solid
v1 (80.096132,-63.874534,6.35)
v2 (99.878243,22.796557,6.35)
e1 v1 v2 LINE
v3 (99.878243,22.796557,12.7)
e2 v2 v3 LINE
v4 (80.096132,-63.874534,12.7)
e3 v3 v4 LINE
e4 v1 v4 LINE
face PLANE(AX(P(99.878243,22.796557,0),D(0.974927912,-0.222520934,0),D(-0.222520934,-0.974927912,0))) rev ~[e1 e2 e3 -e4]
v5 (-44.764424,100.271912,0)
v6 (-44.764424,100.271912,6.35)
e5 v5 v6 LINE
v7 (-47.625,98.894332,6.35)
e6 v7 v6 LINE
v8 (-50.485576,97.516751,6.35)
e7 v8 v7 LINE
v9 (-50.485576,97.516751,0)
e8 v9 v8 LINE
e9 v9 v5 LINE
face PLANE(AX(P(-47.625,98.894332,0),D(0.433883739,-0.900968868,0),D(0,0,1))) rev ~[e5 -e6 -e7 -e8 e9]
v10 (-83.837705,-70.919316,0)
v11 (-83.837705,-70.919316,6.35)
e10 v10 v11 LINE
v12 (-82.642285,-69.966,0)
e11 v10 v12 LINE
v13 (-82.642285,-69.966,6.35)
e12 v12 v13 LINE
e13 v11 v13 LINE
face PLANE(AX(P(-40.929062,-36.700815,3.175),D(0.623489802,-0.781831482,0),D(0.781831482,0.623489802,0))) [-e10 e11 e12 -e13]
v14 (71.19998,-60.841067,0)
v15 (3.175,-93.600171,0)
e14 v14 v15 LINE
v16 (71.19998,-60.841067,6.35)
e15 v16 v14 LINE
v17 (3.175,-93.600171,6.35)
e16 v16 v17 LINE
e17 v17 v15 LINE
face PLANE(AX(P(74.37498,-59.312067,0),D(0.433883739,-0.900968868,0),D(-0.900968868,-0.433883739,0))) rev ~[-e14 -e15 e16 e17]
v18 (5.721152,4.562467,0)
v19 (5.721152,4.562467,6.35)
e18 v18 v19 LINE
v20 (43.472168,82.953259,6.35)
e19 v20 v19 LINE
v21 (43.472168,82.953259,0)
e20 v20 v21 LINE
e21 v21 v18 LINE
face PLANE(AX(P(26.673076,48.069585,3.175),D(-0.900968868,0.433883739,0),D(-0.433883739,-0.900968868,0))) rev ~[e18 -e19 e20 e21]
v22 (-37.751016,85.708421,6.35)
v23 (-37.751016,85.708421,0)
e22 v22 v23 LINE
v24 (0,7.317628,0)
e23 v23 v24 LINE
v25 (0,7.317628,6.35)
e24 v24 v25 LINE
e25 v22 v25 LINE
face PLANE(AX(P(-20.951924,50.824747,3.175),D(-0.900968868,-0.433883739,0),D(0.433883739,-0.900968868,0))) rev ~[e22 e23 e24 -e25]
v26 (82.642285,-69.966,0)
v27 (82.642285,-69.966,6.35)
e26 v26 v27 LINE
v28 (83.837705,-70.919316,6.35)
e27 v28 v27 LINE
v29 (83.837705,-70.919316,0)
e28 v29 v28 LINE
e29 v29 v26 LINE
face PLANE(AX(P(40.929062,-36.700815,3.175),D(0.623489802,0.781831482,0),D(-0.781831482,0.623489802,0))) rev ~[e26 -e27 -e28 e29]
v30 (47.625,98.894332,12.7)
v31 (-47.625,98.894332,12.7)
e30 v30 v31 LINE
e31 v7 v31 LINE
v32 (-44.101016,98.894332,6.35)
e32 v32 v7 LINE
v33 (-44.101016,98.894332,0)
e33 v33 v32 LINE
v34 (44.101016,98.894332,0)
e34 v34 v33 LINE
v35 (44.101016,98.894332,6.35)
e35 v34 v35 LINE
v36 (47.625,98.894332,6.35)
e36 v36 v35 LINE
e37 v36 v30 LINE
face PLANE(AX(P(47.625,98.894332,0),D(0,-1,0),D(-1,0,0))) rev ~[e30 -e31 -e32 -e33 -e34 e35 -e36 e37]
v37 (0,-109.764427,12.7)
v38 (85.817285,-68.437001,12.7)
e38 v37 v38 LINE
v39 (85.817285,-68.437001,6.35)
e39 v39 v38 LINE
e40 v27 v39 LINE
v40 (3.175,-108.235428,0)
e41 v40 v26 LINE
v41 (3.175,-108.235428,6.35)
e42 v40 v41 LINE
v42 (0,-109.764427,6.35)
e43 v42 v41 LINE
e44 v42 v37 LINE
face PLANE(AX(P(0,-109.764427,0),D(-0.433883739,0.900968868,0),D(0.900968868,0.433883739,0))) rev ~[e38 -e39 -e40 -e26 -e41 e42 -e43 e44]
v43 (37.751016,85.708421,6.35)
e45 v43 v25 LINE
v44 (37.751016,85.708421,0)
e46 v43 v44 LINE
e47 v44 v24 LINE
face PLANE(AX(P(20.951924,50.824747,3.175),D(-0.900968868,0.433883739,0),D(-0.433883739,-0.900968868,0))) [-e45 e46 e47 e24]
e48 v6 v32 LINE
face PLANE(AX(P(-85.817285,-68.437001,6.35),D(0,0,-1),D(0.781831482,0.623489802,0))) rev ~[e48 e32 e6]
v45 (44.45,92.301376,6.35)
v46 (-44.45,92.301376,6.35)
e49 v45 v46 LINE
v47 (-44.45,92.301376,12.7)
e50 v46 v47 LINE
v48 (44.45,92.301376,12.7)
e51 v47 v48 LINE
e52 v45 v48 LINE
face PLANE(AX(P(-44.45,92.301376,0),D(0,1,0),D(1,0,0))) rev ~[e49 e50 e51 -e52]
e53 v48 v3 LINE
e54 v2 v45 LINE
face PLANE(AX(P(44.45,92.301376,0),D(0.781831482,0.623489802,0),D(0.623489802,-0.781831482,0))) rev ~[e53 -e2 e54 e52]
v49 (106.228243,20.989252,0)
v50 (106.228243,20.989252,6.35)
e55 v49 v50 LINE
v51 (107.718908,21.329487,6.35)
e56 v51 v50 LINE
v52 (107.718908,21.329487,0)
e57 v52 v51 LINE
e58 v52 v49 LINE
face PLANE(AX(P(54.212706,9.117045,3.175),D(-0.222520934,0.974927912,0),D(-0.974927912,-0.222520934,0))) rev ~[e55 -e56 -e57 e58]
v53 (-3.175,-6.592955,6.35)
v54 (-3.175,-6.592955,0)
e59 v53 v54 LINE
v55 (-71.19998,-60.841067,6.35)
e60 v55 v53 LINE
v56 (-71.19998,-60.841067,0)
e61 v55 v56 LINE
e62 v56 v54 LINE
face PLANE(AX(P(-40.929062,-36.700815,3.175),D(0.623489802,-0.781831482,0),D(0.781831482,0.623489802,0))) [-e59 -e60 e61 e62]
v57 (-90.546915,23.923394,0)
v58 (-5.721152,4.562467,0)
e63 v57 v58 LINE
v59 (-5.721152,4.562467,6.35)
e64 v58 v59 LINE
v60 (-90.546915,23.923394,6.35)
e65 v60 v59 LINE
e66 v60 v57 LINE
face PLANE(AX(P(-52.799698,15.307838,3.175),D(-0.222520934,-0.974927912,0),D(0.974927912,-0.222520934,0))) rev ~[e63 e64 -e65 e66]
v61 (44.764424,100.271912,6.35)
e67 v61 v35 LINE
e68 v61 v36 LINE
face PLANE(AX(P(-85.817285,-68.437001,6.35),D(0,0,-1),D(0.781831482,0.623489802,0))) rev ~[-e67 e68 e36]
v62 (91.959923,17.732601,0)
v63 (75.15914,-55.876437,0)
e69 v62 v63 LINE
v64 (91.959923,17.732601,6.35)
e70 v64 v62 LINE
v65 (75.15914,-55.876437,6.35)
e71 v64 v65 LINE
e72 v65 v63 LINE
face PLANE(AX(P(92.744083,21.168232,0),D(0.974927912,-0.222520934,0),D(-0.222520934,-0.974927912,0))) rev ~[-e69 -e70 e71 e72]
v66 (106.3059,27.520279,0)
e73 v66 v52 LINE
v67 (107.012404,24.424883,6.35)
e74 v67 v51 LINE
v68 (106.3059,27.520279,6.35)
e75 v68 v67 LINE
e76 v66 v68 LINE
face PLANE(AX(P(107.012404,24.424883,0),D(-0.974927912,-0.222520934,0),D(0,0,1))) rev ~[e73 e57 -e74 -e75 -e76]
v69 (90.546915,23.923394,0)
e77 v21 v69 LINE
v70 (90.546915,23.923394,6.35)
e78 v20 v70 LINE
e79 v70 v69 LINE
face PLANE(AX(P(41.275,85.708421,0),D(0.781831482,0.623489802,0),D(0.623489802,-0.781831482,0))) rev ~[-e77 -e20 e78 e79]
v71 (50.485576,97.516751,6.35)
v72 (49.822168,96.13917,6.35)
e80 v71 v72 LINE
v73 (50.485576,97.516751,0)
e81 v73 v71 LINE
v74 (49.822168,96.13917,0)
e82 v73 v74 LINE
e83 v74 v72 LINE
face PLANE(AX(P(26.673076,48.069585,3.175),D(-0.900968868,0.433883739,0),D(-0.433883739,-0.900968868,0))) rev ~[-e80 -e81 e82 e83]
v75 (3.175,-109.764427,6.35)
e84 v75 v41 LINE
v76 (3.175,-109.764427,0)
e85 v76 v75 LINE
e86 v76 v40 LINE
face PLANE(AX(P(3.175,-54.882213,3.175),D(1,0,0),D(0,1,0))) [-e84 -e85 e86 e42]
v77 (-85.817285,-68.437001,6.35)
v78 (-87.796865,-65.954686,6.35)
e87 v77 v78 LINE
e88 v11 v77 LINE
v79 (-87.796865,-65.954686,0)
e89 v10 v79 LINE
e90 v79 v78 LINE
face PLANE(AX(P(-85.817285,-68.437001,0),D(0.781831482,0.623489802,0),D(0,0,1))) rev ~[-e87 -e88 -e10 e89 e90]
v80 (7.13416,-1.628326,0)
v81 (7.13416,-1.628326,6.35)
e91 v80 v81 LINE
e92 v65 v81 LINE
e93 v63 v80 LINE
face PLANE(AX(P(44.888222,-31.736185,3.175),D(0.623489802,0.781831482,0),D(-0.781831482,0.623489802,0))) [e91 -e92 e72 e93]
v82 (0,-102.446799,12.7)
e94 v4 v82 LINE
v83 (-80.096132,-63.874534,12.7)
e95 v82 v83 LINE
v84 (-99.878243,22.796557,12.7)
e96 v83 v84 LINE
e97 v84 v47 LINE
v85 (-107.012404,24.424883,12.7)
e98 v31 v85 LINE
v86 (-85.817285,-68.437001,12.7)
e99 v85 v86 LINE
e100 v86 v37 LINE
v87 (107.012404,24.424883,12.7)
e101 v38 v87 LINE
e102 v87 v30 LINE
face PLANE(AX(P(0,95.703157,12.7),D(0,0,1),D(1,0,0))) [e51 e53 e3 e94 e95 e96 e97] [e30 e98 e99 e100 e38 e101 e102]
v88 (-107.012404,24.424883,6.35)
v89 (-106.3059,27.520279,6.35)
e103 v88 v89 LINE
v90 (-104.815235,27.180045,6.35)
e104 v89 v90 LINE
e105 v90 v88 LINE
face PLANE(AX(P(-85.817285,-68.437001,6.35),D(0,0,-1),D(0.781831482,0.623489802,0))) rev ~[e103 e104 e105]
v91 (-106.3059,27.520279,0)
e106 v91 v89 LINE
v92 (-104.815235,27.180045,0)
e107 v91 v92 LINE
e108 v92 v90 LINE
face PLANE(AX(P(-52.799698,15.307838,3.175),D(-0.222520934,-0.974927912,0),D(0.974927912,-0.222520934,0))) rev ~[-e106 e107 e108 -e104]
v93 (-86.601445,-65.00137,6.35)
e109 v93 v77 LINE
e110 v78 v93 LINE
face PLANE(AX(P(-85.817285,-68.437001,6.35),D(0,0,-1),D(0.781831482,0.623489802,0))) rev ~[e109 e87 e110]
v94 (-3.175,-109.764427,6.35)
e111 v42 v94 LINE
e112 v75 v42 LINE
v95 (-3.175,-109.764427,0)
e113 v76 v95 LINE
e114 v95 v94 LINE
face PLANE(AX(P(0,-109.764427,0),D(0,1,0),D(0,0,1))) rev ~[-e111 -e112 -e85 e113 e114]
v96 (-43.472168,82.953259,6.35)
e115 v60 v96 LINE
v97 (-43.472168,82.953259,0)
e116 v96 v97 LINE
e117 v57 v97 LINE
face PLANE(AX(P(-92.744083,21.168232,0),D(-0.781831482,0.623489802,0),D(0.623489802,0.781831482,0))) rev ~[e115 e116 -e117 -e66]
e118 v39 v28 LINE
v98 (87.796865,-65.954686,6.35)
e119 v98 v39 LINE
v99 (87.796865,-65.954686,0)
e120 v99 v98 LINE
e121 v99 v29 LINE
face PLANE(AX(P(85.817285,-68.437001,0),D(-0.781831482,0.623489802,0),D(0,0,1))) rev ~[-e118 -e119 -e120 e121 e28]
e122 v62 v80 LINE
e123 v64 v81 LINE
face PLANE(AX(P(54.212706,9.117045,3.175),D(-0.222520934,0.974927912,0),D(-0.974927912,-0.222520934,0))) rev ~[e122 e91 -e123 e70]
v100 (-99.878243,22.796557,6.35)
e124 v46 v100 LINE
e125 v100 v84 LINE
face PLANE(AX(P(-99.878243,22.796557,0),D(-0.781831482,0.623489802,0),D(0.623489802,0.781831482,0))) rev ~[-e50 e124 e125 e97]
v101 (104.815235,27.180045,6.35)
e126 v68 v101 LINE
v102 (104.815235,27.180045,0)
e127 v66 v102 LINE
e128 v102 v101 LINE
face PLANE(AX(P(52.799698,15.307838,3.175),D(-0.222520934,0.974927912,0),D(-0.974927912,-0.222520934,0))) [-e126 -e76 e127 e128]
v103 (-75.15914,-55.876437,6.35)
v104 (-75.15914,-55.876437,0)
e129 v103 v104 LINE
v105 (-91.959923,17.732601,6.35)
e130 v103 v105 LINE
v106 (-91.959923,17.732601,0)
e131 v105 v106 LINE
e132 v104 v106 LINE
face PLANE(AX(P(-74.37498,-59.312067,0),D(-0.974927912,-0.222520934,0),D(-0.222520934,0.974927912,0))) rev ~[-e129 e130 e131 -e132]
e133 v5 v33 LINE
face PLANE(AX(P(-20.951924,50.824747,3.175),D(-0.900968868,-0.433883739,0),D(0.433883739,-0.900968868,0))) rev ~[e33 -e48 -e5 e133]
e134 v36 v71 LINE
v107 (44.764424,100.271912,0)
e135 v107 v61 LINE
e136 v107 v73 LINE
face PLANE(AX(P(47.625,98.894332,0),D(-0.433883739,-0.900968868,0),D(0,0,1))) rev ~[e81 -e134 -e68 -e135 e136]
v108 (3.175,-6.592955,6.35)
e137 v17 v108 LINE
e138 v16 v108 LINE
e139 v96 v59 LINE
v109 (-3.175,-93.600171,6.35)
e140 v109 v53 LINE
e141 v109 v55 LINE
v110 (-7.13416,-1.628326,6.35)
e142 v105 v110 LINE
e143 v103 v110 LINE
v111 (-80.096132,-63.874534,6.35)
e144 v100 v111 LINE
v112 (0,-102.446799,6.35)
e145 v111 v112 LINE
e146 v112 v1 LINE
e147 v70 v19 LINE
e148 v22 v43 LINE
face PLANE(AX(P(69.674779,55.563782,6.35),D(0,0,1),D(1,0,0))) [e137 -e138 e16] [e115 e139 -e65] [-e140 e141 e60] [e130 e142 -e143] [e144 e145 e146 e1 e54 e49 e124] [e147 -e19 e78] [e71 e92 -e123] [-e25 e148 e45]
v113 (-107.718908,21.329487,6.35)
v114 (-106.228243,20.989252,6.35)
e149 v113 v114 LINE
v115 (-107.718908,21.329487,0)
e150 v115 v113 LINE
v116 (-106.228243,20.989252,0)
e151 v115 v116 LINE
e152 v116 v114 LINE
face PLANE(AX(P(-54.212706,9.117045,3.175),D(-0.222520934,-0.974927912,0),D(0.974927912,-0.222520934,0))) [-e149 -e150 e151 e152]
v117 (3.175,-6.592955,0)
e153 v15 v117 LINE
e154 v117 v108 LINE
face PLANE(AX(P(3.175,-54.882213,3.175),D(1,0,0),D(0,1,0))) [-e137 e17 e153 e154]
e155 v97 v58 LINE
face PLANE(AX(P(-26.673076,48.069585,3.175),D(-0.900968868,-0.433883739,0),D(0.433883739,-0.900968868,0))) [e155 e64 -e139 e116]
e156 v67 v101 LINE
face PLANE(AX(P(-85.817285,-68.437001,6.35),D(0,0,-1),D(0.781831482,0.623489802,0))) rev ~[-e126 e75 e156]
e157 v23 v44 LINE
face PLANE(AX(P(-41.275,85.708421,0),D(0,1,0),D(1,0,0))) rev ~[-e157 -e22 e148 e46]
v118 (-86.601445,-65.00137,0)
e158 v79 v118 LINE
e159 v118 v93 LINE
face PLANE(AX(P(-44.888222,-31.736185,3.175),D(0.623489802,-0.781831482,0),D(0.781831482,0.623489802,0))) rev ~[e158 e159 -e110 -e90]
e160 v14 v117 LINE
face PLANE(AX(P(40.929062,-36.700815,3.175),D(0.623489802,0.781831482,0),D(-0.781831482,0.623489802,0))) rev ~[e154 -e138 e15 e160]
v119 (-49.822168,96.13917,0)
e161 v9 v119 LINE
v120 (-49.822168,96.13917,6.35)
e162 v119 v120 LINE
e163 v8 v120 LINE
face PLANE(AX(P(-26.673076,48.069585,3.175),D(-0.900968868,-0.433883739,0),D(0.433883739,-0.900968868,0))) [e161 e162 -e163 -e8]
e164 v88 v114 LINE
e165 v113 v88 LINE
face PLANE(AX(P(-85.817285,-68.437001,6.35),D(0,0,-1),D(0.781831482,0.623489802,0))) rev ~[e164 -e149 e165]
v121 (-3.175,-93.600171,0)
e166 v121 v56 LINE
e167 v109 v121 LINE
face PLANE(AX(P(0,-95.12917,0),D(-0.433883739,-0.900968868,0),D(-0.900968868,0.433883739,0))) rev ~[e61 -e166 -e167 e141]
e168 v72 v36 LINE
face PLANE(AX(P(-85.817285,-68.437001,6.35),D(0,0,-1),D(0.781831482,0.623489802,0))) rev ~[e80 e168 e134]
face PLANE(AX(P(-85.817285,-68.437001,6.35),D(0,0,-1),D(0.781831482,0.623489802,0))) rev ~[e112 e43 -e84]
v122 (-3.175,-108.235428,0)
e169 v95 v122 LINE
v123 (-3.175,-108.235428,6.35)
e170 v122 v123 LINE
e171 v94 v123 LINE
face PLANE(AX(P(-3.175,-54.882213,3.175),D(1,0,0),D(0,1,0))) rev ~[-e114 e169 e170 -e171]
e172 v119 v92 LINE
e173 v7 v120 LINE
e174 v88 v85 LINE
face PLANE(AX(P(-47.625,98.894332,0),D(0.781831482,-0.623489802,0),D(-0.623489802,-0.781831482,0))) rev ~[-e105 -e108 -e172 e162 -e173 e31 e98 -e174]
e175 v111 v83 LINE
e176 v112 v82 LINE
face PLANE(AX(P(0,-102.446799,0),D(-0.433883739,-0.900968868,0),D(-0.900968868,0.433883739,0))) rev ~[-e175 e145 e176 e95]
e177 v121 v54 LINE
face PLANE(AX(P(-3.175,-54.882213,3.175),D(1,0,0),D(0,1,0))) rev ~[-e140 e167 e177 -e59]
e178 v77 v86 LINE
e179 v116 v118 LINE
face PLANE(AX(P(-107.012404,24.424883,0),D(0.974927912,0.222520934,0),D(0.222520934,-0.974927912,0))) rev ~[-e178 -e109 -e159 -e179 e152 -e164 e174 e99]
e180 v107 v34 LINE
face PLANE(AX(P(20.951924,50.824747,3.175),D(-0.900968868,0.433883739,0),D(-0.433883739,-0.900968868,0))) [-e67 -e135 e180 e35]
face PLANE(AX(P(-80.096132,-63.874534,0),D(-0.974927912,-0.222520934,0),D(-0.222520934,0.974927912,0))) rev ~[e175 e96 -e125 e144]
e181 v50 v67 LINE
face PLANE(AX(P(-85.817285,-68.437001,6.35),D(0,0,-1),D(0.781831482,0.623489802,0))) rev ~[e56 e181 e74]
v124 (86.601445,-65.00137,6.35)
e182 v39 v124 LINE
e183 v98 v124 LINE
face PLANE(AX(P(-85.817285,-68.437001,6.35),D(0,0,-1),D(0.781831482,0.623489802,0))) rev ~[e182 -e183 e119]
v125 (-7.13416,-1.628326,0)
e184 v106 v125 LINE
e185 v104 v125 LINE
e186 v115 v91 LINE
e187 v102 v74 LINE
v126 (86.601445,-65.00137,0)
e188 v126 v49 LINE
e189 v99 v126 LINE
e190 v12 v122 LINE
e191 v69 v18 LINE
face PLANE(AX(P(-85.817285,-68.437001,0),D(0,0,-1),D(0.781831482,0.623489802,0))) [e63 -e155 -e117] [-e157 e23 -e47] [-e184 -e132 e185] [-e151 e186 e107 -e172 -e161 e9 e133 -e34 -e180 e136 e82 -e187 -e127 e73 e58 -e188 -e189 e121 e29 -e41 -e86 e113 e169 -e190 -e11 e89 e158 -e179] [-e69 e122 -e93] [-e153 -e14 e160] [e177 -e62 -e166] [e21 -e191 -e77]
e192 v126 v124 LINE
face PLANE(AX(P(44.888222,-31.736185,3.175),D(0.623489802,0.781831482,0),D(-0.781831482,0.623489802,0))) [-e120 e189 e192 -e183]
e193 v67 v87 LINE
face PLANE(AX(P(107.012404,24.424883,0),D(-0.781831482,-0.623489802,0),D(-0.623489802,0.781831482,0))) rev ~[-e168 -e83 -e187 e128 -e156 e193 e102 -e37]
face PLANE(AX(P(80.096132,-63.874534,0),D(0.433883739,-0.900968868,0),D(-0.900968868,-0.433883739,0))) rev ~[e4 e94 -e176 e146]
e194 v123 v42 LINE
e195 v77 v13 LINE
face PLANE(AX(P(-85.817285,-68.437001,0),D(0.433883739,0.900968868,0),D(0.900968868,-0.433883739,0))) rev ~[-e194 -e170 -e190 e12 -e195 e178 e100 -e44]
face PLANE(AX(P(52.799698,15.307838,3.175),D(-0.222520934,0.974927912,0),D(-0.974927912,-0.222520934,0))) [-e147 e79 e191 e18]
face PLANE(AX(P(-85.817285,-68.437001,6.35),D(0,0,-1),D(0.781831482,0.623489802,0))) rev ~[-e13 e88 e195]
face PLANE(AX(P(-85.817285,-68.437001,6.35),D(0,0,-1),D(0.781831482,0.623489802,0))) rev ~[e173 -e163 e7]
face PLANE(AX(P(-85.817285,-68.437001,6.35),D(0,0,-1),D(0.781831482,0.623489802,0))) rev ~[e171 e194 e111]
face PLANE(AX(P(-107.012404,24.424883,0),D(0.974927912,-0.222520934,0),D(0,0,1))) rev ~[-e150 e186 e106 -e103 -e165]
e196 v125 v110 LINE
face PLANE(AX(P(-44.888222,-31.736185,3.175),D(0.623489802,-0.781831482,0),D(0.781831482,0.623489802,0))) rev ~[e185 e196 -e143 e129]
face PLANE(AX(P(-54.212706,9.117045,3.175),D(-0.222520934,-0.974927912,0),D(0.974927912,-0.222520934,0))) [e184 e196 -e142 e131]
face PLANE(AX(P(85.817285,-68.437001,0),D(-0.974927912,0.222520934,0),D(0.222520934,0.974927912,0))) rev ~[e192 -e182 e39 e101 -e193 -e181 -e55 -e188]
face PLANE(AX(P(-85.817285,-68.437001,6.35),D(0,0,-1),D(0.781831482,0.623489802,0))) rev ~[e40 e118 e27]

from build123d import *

# Parameters (mm, degrees)
F1_E8_W   = 109.7644269796
F1_E8_H   = 6.35
F2_DEPTH  = 3.175
F1_E7_W   = 109.7644269796
F1_E7_H   = 6.35
F3_DEPTH  = 3.175
F4_E6_W   = 109.7644269796
F4_E6_H   = 6.35
F5_DEPTH  = 3.175
F4_E5_W   = 109.7644269796
F4_E5_H   = 6.35
F6_DEPTH  = 3.175
F7_E4_W   = 109.7644269796
F7_E4_H   = 6.35
F8_DEPTH  = 3.175
F7_E3_W   = 109.7644269796
F7_E3_H   = 6.35
F9_DEPTH  = 3.175
F10_E9_W  = 109.7644269796
F10_E9_H  = 6.35
F11_DEPTH = 3.175
F12_DEPTH = 12.7
F13_DEPTH = 6.35


with BuildPart() as f2:
    # F1_E8 (on explicit) → F2 (new body, symmetric)
    with BuildSketch(Plane(origin=(0, -109.7644269796, 0), x_dir=(0, 1, 0), z_dir=(1, 0, 0))):
        with Locations((54.8822134898, 3.175)):
            Rectangle(F1_E8_W, F1_E8_H)
    extrude(amount=F2_DEPTH, both=True)

    # F1_E7 (on explicit) → F3 (join, symmetric)
    with BuildSketch(Plane(origin=(85.8172846677, -68.4370008286, 0), x_dir=(-0.7818314825, 0.6234898019, 0), z_dir=(0.6234898019, 0.7818314825, 0))):
        with Locations((54.8822134898, 3.175)):
            Rectangle(F1_E7_W, F1_E7_H)
    extrude(amount=F3_DEPTH, both=True)

    # F4_E6 (on explicit) → F5 (join, symmetric)
    with BuildSketch(Plane(origin=(107.012403627, 24.4248828067, 0), x_dir=(-0.9749279122, -0.222520934, 0), z_dir=(-0.222520934, 0.9749279122, 0))):
        with Locations((54.8822134898, 3.175)):
            Rectangle(F4_E6_W, F4_E6_H)
    extrude(amount=F5_DEPTH, both=True)

    # F4_E5 (on explicit) → F6 (join, symmetric)
    with BuildSketch(Plane(origin=(47.625, 98.8943315118, 0), x_dir=(-0.4338837391, -0.9009688679, 0), z_dir=(-0.9009688679, 0.4338837391, 0))):
        with Locations((54.8822134898, 3.175)):
            Rectangle(F4_E5_W, F4_E5_H)
    extrude(amount=F6_DEPTH, both=True)

    # F7_E4 (on explicit) → F8 (join, symmetric)
    with BuildSketch(Plane(origin=(-47.625, 98.8943315118, 0), x_dir=(0.4338837391, -0.9009688679, 0), z_dir=(-0.9009688679, -0.4338837391, 0))):
        with Locations((54.8822134898, 3.175)):
            Rectangle(F7_E4_W, F7_E4_H)
    extrude(amount=F8_DEPTH, both=True)

    # F7_E3 (on explicit) → F9 (join, symmetric)
    with BuildSketch(Plane(origin=(-107.012403627, 24.4248828067, 0), x_dir=(0.9749279122, -0.222520934, 0), z_dir=(-0.222520934, -0.9749279122, 0))):
        with Locations((54.8822134898, 3.175)):
            Rectangle(F7_E3_W, F7_E3_H)
    extrude(amount=F9_DEPTH, both=True)

    # F10_E9 (on explicit) → F11 (join, symmetric)
    with BuildSketch(Plane(origin=(-85.8172846677, -68.4370008286, 0), x_dir=(0.7818314825, 0.6234898019, 0), z_dir=(0.6234898019, -0.7818314825, 0))):
        with Locations((54.8822134898, 3.175)):
            Rectangle(F10_E9_W, F10_E9_H)
    extrude(amount=F11_DEPTH, both=True)

    # F0 (on Top) → F12 (join)
    with BuildSketch(Plane.XY):
        Polygon((44.45, 92.3013760776), (47.625, 98.8943315118), (-47.625, 98.8943315118), (-44.45, 92.3013760776), align=None)
        Polygon((99.8782433852, 22.7965572862), (107.012403627, 24.4248828067), (47.625, 98.8943315118), (44.45, 92.3013760776), align=None)
        Polygon((80.0961323565, -63.8745341067), (85.8172846677, -68.4370008286), (107.012403627, 24.4248828067), (99.8782433852, 22.7965572862), align=None)
        Polygon((0, -109.7644269796), (85.8172846677, -68.4370008286), (80.0961323565, -63.8745341067), (0, -102.4467985143), align=None)
        Polygon((-85.8172846677, -68.4370008286), (0, -109.7644269796), (0, -102.4467985143), (-80.0961323565, -63.8745341067), align=None)
        Polygon((-107.012403627, 24.4248828067), (-85.8172846677, -68.4370008286), (-80.0961323565, -63.8745341067), (-99.8782433852, 22.7965572862), align=None)
        Polygon((-47.625, 98.8943315118), (-107.012403627, 24.4248828067), (-99.8782433852, 22.7965572862), (-44.45, 92.3013760776), align=None)
    extrude(amount=F12_DEPTH)

    # F0 (on Top) → F13 (join)
    with BuildSketch(Plane.XY):
        Polygon((92.7440831434, 21.1682317658), (99.8782433852, 22.7965572862), (44.45, 92.3013760776), (41.275, 85.7084206435), align=None)
        Polygon((41.275, 85.7084206435), (44.45, 92.3013760776), (-44.45, 92.3013760776), (-41.275, 85.7084206435), align=None)
        Polygon((-44.45, 92.3013760776), (-99.8782433852, 22.7965572862), (-92.7440831434, 21.1682317658), (-41.275, 85.7084206435), align=None)
        Polygon((-99.8782433852, 22.7965572862), (-80.0961323565, -63.8745341067), (-74.3749800453, -59.3120673848), (-92.7440831434, 21.1682317658), align=None)
        Polygon((-80.0961323565, -63.8745341067), (0, -102.4467985143), (0, -95.129170049), (-74.3749800453, -59.3120673848), align=None)
        Polygon((0, -102.4467985143), (80.0961323565, -63.8745341067), (74.3749800453, -59.3120673848), (0, -95.129170049), align=None)
        Polygon((74.3749800453, -59.3120673848), (80.0961323565, -63.8745341067), (99.8782433852, 22.7965572862), (92.7440831434, 21.1682317658), align=None)
    extrude(amount=F13_DEPTH)


solid = f2.part
